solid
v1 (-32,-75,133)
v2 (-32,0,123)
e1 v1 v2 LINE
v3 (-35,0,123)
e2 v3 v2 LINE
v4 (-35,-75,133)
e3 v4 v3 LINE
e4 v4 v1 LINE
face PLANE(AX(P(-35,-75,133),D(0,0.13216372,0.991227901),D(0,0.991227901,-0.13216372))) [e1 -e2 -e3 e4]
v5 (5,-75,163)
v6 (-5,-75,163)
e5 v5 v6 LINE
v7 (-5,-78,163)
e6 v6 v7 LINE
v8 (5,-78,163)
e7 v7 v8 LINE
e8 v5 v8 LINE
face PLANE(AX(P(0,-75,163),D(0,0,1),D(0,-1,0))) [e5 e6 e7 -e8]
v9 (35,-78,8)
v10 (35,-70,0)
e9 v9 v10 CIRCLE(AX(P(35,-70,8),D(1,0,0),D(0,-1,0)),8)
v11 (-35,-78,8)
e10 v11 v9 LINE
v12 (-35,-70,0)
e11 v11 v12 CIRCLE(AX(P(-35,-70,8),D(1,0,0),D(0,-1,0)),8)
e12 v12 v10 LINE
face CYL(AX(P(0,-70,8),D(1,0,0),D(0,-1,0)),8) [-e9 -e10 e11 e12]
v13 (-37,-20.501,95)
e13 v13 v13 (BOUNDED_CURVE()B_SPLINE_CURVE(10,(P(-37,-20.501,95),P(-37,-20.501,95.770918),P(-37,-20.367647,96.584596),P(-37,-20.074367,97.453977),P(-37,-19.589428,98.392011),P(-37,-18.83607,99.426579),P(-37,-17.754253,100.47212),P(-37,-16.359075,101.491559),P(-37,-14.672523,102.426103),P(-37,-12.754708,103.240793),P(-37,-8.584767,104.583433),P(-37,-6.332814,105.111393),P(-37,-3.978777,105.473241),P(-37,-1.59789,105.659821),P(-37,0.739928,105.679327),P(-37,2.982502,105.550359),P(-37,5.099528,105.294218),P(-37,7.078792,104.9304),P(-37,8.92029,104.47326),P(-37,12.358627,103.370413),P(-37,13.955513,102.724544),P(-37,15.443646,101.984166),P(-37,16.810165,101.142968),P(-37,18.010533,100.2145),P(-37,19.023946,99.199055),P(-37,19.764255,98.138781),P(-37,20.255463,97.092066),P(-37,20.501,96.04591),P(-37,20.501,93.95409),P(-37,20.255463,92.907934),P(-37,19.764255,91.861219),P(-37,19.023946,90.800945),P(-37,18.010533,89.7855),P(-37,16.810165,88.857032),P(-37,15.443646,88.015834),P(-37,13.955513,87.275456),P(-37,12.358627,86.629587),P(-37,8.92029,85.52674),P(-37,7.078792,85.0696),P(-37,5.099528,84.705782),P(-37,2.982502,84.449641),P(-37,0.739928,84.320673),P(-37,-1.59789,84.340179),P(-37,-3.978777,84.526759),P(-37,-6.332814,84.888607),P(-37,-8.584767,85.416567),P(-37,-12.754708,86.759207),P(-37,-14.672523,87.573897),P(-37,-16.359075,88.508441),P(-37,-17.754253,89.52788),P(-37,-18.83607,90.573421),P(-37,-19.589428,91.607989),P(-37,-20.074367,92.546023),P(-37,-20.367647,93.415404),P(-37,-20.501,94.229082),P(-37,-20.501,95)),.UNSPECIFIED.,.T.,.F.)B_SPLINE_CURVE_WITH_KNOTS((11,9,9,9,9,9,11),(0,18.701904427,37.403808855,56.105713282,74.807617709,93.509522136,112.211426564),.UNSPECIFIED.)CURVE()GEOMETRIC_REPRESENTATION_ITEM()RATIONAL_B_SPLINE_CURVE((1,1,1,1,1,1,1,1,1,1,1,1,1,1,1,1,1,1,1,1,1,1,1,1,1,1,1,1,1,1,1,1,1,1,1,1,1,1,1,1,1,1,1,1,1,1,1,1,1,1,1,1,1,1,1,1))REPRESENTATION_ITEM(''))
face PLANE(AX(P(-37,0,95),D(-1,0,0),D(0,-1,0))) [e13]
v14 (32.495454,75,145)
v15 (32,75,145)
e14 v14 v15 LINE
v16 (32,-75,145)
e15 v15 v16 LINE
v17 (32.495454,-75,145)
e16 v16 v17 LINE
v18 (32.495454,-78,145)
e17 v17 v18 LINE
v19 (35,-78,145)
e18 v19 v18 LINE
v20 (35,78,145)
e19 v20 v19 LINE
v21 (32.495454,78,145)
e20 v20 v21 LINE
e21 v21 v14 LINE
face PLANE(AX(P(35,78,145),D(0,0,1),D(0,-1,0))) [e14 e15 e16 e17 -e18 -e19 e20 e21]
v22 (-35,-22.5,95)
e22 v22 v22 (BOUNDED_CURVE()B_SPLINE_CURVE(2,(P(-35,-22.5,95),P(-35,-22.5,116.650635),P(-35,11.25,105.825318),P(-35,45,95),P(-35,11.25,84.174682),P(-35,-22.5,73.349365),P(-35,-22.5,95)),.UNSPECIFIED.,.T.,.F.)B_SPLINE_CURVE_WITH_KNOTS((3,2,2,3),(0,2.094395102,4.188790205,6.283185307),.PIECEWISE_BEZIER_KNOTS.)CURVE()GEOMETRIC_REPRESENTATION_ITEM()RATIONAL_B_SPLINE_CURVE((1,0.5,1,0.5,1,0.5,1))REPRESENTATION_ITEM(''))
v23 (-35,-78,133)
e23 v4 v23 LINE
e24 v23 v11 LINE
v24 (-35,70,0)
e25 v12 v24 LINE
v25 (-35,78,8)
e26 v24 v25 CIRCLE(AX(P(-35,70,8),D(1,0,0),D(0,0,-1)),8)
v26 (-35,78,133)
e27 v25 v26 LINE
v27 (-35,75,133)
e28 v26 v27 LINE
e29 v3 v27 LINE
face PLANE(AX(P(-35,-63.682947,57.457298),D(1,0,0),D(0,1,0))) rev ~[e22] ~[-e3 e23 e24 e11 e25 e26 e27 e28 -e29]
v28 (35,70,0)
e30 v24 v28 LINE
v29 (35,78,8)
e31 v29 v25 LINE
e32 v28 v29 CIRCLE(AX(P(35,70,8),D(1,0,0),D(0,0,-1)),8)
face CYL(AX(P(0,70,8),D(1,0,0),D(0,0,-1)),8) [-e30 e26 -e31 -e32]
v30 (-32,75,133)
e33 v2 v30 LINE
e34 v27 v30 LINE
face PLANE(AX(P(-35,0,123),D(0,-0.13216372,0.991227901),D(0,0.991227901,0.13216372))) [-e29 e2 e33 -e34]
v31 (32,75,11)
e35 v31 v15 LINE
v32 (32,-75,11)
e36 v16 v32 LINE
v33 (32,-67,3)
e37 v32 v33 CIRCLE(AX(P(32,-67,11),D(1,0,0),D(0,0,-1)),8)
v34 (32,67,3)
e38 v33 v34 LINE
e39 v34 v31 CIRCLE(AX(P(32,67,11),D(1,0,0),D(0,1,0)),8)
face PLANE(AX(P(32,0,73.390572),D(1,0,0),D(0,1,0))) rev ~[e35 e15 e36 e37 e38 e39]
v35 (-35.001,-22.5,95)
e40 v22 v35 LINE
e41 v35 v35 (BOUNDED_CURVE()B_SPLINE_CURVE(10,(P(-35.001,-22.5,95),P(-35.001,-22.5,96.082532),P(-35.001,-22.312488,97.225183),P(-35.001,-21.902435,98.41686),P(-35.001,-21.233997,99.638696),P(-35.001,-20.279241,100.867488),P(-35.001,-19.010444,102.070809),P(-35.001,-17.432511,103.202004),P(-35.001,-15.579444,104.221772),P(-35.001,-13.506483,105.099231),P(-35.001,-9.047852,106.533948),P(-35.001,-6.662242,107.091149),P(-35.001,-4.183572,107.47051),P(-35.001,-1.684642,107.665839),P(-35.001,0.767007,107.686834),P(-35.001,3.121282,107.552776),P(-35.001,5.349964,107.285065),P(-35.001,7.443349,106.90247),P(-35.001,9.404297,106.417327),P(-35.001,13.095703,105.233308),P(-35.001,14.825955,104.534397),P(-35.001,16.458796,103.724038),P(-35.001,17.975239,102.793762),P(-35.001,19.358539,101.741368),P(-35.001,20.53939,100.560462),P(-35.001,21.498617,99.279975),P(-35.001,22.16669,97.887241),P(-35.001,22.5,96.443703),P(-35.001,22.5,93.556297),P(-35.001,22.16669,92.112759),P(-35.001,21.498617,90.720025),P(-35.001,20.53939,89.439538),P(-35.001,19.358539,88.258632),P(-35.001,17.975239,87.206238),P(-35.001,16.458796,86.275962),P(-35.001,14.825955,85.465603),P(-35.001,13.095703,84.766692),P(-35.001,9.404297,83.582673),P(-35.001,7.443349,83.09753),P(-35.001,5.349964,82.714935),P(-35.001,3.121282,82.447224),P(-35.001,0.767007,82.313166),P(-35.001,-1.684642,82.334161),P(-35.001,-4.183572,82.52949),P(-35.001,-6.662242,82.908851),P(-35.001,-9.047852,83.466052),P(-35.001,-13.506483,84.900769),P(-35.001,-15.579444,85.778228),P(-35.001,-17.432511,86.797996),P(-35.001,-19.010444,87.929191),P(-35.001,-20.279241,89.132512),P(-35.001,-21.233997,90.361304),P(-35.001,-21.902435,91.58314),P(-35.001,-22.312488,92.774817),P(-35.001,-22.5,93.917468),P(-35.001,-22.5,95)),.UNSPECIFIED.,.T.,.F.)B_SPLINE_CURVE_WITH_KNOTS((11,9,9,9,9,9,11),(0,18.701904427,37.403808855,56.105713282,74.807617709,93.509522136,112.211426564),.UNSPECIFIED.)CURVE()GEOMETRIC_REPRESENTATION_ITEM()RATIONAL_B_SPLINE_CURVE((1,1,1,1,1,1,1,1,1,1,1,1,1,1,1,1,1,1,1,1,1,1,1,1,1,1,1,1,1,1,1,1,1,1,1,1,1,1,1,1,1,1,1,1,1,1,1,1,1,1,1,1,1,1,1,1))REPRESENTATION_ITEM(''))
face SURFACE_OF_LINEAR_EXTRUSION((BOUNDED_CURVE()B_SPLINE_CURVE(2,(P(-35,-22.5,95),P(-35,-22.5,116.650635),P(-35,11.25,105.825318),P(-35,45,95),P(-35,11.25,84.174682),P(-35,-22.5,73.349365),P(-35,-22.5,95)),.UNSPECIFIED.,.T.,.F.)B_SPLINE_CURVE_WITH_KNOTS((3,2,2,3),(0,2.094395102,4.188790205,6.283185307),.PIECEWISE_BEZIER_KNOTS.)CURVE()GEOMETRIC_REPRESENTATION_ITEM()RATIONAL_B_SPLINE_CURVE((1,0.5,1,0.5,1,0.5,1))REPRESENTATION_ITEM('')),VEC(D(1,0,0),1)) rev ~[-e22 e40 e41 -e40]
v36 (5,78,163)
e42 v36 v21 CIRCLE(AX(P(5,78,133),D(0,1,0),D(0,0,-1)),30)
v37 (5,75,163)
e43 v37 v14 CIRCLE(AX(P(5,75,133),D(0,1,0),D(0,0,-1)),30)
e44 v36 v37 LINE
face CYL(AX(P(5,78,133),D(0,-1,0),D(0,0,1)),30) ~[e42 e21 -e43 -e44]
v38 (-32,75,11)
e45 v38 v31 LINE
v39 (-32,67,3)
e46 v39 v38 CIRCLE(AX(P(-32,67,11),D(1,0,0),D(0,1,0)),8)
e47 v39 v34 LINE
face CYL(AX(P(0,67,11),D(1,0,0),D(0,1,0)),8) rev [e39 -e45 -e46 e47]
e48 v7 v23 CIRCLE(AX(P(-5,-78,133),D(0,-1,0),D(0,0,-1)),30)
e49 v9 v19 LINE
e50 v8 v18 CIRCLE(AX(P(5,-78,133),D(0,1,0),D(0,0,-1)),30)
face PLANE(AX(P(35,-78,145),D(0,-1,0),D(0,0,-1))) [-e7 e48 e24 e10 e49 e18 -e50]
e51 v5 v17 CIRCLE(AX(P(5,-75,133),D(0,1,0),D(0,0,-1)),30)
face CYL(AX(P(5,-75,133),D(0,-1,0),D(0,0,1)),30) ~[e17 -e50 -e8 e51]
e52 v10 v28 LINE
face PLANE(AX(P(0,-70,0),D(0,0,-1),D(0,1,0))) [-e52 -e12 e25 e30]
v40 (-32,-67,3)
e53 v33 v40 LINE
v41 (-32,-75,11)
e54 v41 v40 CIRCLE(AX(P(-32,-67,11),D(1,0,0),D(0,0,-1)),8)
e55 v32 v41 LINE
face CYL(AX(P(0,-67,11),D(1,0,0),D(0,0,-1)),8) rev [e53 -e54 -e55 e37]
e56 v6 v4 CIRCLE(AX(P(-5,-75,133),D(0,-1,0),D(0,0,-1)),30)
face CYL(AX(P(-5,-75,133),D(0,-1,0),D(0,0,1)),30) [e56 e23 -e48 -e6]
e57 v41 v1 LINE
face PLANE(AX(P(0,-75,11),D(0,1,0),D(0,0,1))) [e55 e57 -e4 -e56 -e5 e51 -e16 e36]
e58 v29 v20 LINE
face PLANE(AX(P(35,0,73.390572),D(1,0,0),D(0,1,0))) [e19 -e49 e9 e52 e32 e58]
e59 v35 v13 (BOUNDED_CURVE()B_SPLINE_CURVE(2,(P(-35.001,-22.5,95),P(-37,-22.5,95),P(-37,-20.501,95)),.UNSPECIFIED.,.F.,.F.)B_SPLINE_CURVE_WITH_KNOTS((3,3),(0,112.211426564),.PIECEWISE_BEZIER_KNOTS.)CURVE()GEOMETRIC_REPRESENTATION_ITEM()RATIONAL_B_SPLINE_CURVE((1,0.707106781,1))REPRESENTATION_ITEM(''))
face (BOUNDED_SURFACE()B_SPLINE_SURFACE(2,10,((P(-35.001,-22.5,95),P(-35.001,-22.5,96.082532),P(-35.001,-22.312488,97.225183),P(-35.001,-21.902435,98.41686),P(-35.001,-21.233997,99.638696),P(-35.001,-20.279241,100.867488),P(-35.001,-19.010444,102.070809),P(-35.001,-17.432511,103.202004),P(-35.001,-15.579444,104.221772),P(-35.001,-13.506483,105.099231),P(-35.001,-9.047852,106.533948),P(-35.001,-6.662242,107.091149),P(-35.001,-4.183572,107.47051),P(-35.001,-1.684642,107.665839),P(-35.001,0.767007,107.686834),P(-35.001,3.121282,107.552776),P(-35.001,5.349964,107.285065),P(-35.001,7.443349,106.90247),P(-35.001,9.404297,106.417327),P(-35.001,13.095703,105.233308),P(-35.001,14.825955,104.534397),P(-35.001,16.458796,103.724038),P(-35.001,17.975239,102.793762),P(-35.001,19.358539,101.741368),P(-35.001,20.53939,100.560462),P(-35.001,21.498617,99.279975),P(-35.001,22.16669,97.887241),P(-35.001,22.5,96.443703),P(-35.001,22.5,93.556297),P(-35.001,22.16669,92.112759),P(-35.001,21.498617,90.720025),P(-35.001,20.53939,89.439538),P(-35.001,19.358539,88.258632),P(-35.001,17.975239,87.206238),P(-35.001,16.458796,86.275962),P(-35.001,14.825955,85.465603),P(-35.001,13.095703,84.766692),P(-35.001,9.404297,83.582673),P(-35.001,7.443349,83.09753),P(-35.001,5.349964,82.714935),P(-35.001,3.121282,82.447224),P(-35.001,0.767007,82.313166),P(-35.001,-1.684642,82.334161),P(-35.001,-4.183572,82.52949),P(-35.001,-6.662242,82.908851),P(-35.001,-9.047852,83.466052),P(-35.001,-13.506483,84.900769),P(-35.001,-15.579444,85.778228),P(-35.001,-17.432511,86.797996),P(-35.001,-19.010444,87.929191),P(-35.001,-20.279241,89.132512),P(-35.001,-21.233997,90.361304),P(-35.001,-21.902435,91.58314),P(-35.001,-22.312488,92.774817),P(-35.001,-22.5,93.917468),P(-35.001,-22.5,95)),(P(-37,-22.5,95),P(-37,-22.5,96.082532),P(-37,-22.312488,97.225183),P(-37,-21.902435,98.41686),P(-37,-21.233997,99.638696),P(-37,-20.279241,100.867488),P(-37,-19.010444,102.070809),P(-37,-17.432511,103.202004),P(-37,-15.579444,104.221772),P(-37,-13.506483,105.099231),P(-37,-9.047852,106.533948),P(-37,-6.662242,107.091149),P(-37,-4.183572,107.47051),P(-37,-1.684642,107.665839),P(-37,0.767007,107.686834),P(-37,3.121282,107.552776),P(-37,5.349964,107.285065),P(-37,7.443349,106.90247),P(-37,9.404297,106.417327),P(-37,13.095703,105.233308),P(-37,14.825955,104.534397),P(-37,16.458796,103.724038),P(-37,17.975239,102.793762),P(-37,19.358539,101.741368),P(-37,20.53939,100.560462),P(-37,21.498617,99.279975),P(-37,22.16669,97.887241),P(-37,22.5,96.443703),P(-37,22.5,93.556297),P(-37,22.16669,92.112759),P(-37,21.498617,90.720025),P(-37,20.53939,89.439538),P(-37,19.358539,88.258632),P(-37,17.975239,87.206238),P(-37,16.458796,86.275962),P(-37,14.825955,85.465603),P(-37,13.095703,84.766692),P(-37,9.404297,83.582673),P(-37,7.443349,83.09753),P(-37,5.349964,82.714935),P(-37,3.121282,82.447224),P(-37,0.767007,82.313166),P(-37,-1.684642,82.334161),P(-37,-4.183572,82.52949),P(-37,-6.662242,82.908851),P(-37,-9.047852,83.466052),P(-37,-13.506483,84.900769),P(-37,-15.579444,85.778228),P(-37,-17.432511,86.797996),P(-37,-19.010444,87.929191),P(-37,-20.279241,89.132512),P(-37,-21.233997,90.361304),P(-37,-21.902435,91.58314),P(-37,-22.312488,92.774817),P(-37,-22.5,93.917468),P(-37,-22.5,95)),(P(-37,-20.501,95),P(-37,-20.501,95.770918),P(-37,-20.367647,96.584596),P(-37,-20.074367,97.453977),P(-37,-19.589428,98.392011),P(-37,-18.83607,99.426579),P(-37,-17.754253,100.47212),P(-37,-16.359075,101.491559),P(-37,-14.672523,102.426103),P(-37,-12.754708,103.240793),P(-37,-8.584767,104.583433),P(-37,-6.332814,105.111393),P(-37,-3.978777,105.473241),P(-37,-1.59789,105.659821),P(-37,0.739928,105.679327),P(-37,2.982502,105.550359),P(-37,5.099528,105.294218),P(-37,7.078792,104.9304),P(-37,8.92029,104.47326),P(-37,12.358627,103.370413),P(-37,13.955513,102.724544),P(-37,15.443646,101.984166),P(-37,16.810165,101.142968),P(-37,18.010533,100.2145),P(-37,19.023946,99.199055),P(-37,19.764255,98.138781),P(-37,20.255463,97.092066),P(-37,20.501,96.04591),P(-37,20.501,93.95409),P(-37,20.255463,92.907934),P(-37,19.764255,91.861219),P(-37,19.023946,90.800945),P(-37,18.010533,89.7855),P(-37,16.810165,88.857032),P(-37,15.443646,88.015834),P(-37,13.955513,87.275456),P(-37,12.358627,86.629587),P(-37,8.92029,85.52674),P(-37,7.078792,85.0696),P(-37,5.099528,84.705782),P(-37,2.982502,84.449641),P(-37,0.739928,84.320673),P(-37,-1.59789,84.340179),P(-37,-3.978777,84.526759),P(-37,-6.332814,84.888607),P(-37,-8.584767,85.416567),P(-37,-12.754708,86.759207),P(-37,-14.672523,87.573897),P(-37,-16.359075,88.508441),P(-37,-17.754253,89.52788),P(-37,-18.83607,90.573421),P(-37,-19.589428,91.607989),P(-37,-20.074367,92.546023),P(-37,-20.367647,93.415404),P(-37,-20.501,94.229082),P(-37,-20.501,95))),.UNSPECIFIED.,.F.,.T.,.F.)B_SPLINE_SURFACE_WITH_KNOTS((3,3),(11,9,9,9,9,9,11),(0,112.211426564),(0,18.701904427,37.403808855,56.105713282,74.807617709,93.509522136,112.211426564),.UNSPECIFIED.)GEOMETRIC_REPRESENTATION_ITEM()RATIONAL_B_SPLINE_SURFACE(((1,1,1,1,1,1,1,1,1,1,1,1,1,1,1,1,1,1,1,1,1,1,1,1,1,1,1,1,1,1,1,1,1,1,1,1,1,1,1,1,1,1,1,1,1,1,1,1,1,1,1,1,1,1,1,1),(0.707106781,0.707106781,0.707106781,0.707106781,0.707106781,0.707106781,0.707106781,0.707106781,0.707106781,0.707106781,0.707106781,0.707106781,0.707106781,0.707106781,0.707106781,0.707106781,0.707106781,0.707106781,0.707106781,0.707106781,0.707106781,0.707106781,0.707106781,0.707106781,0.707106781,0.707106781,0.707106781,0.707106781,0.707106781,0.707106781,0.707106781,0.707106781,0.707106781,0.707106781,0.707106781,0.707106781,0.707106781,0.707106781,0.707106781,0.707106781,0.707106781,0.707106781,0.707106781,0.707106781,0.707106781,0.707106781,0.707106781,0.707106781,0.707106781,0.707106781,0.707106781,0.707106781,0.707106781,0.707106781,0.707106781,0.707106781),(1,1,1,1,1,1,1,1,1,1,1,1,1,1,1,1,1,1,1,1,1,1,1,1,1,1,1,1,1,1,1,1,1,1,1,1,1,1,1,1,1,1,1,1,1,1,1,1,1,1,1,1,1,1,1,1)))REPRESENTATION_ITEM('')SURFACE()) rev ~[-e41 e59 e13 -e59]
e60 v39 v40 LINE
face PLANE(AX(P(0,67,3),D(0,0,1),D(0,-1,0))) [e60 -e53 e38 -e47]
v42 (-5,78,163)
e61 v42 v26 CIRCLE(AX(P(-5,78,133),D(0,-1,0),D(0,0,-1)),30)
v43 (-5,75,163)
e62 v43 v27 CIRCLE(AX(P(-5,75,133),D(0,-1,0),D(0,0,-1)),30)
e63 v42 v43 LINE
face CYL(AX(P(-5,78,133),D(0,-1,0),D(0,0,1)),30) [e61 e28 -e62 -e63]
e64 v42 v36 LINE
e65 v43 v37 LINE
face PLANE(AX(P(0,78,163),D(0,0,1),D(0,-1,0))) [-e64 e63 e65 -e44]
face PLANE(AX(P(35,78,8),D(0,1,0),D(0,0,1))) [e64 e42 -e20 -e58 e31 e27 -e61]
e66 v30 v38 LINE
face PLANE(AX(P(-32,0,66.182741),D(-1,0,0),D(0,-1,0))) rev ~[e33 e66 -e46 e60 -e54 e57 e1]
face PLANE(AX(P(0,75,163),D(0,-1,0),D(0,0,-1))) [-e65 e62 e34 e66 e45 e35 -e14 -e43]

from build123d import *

# Parameters (mm, degrees)
F1_DEPTH  = 35
F2_R      = 30
F5_DEPTH  = 3
F8_DEPTH  = 3
F10_DEPTH = 2
F11_R     = 1.999


# Not quite as in the source:
# - a fillet or chamfer is up to 0.001 mm smaller than in the source, because OpenCascade refuses the exact size


with BuildPart() as f1:
    # F0 (on Right) → F1 (new body, symmetric)
    with BuildSketch(Plane.YZ):
        with BuildLine():
            Line((-75, 163), (-78, 163))
            Line((-78, 163), (-78, 8))
            ThreePointArc((-78, 8), (-75.6568542495, 2.3431457505), (-70, 0))
            Line((-70, 0), (0, 0))
            Line((0, 0), (0, 3))
            Line((0, 3), (-67, 3))
            ThreePointArc((-67, 3), (-72.6568542495, 5.3431457505), (-75, 11))
            Line((-75, 11), (-75, 163))
        make_face()
        with BuildLine():
            Line((0, 3), (0, 0))
            Line((0, 0), (70, 0))
            ThreePointArc((70, 0), (75.6568542495, 2.3431457505), (78, 8))
            Line((78, 8), (78, 163))
            Line((78, 163), (75, 163))
            Line((75, 163), (75, 11))
            ThreePointArc((75, 11), (72.6568542495, 5.3431457505), (67, 3))
            Line((67, 3), (0, 3))
        make_face()
    extrude(amount=F1_DEPTH, both=True)

    # F2
    f2_edges = [f1.edges().sort_by_distance(p)[0] for p in [
        (35, -76.5, 163),
        (35, 76.5, 163),
        (-35, 76.5, 163),
        (-35, -76.5, 163),
    ]]
    fillet(f2_edges, radius=F2_R)

    # F4 (on offset) → F5 (join)
    with BuildSketch(Plane(origin=(-35, 0, 0), x_dir=(0, -1, 0), z_dir=(-1, 0, 0))):
        with BuildLine():
            Line((-75, 133), (-78, 133))
            Line((-78, 133), (-78, 8))
            ThreePointArc((-78, 8), (-75.6568542495, 2.3431457505), (-70, 0))
            Line((-70, 0), (0, 0))
            Line((0, 0), (70, 0))
            ThreePointArc((70, 0), (75.6568542495, 2.3431457505), (78, 8))
            Line((78, 8), (78, 133))
            Line((78, 133), (75, 133))
            Line((75, 133), (0, 123))
            Line((0, 123), (-75, 133))
        make_face()
    extrude(amount=-F5_DEPTH)

    # F7 (on offset) → F8 (join)
    with BuildSketch(Plane.YZ.offset(35)):
        with BuildLine():
            Line((-78, 145), (-78, 8))
            ThreePointArc((-78, 8), (-75.6568542495, 2.3431457505), (-70, 0))
            Line((-70, 0), (0, 0))
            Line((0, 0), (70, 0))
            ThreePointArc((70, 0), (75.6568542495, 2.3431457505), (78, 8))
            Line((78, 8), (78, 145))
            Line((78, 145), (0, 145))
            Line((0, 145), (-78, 145))
        make_face()
    extrude(amount=-F8_DEPTH)

    # F9 (on offset) → F10 (join)
    with BuildSketch(Plane(origin=(-35, 0, 0), x_dir=(0, -1, 0), z_dir=(-1, 0, 0))):
        with BuildLine():
            add(Edge.make_bspline(
                [(22.5, 95), (22.5, 116.6506350946), (-11.25, 105.8253175473), (-45, 95), (-11.25, 84.1746824527), (22.5, 73.3493649054), (22.5, 95)],
                knots=[0, 0, 0, 2.0943951024, 2.0943951024, 4.1887902048, 4.1887902048, 6.2831853072, 6.2831853072, 6.2831853072], degree=2, weights=[1, 0.5, 1, 0.5, 1, 0.5, 1]))
        make_face()
    extrude(amount=F10_DEPTH)

    # F11 (radius 2 in the source; OpenCascade refuses exactly that, so slightly less here)
    f11_edges = [f1.edges().sort_by_distance(p)[0] for p in [
        (-37, 22.5, 95.000001),
    ]]
    fillet(f11_edges, radius=F11_R)


solid = f1.part
